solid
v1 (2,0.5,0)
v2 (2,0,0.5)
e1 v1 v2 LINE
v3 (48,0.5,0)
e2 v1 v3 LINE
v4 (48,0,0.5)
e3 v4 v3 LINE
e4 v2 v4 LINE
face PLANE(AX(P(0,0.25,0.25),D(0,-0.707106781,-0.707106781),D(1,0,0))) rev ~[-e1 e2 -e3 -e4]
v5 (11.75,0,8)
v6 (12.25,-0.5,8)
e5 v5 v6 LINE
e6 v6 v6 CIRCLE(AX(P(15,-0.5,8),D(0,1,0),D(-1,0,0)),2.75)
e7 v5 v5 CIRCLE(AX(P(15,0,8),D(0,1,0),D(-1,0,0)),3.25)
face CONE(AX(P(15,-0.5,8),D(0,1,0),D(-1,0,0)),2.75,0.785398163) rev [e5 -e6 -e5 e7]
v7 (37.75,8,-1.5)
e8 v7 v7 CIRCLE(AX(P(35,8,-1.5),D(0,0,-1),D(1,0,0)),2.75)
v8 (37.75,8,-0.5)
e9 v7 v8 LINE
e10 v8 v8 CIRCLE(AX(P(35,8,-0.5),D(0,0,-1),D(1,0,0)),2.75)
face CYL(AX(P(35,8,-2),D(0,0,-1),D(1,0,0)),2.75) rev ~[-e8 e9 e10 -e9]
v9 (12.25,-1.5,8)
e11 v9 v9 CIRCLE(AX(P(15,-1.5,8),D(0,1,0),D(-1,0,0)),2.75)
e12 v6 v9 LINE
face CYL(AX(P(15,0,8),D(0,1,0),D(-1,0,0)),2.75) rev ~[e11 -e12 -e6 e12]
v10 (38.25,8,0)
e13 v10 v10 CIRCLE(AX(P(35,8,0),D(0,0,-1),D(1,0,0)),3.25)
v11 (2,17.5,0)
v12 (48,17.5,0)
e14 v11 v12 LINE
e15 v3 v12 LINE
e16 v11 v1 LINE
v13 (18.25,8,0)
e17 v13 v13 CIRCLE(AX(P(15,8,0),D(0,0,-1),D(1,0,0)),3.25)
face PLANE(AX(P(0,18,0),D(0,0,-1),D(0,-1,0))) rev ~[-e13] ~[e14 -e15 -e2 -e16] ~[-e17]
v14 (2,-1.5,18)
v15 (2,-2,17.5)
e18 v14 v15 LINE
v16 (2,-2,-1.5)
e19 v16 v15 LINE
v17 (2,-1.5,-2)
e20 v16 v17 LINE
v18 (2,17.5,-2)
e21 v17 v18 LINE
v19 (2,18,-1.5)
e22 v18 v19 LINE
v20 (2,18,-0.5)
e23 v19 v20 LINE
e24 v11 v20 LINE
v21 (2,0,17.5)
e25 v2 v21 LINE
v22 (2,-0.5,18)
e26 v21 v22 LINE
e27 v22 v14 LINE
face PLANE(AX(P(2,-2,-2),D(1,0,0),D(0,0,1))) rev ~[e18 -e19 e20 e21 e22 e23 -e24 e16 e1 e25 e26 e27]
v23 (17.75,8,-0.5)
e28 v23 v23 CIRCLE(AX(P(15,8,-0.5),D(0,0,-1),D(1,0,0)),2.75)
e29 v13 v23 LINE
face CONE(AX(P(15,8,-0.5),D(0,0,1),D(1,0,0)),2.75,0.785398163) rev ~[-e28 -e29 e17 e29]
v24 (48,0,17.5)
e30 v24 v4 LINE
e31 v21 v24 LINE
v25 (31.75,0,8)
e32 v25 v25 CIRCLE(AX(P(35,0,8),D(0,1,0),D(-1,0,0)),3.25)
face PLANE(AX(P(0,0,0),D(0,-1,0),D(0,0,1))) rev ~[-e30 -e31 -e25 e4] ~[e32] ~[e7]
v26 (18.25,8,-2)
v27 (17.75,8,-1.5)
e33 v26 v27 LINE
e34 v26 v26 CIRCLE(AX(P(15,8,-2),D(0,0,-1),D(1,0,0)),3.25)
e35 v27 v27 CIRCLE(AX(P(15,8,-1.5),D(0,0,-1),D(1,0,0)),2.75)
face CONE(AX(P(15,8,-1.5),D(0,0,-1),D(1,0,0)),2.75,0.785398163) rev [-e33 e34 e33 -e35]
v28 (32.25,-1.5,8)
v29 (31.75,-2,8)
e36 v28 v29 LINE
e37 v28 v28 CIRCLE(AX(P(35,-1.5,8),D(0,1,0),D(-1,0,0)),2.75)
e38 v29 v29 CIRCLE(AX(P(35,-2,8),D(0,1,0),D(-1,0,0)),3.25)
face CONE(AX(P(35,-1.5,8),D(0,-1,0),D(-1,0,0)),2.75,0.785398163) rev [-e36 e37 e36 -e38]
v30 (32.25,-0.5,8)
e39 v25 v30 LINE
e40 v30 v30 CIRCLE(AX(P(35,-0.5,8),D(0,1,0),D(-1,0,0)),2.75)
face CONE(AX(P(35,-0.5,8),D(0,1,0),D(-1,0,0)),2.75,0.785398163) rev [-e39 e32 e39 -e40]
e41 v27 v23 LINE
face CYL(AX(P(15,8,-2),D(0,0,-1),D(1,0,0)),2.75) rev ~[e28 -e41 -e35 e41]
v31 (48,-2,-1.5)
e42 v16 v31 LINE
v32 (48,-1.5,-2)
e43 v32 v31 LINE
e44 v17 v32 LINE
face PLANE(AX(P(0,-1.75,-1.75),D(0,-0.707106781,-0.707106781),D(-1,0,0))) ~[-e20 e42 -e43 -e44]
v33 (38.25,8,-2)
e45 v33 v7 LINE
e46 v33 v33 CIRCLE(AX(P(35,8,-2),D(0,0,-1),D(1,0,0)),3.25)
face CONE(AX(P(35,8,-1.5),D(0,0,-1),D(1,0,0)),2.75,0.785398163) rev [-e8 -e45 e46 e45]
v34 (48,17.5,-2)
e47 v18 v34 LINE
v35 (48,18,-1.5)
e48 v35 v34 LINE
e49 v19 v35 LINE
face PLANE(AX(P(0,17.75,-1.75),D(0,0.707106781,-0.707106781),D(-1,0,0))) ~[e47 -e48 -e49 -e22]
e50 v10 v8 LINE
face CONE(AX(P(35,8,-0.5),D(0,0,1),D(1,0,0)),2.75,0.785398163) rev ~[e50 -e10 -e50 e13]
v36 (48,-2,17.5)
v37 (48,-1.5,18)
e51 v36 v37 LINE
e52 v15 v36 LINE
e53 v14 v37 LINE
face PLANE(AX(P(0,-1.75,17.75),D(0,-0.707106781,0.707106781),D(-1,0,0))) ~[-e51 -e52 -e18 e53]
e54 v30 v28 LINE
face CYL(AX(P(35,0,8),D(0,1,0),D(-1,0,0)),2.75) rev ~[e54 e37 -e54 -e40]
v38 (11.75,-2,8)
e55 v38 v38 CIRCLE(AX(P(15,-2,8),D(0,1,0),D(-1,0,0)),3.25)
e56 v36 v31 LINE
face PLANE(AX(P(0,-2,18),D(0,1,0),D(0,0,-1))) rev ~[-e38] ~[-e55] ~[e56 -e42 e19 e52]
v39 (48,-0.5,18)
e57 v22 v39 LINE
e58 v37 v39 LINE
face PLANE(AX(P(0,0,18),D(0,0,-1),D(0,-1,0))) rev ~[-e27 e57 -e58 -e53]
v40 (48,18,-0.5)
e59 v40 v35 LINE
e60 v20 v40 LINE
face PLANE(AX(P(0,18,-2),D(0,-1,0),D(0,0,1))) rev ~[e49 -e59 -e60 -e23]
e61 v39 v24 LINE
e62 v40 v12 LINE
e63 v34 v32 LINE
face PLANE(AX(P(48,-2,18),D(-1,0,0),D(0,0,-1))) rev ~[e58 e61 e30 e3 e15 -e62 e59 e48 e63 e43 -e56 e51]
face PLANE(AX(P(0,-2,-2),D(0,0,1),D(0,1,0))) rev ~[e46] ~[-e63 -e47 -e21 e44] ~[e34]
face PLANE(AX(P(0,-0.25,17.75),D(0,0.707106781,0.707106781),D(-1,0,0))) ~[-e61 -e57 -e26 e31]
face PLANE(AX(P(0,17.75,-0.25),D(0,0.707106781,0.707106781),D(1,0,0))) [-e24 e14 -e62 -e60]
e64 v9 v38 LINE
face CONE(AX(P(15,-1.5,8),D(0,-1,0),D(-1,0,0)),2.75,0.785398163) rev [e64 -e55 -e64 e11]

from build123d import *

# Parameters (mm, degrees)
F1_DEPTH  = 50
F2_SIZE   = 0.5
F3_R      = 2.75
F4_DEPTH  = 25
F5_SIZE   = 0.5
F6_R      = 2.75
F7_DEPTH  = 25
F8_SIZE   = 0.5
F9_W      = 1.5
F9_H      = 19
F10_DEPTH = 25


with BuildPart() as f1:
    # F0 (on Right) → F1 (new body)
    with BuildSketch(Plane.YZ):
        Polygon((18, 0), (0, 0), (0, 18), (-2, 18), (-2, -2), (18, -2), align=None)
    extrude(amount=F1_DEPTH)

    # F2
    f2_edges = [f1.edges().sort_by_distance(p)[0] for p in [
        (25, 0, 18),
        (25, -2, 18),
        (0, -1, 18),
        (50, -1, 18),
        (25, 18, 0),
        (25, 0, 0),
        (0, 9, 0),
        (50, 9, 0),
        (25, -2, -2),
        (25, 18, -2),
        (0, 8, -2),
        (50, 8, -2),
        (0, -2, 8),
        (50, -2, 8),
    ]]
    chamfer(f2_edges, length=F2_SIZE)

    # F3 (on face) → F4 (cut)
    with BuildSketch(Plane(origin=(0, 0, 0), x_dir=(-1, 0, 0), z_dir=(0, 1, 0))):
        with Locations((-15, 8)):
            Circle(F3_R)
        with Locations((-35, 8)):
            Circle(F3_R)
    extrude(amount=-F4_DEPTH, mode=Mode.SUBTRACT)

    # F5
    f5_edges = [f1.edges().sort_by_distance(p)[0] for p in [
        (17.75, 0, 8),
        (12.25, -1, 8),
        (17.75, -2, 8),
        (37.75, 0, 8),
        (32.25, -1, 8),
        (37.75, -2, 8),
    ]]
    chamfer(f5_edges, length=F5_SIZE)

    # F6 (on face) → F7 (cut)
    with BuildSketch(Plane(origin=(0, 0, -2), x_dir=(1, 0, 0), z_dir=(0, 0, -1))):
        with Locations((15, -8)):
            Circle(F6_R)
        with Locations((35, -8)):
            Circle(F6_R)
    extrude(amount=-F7_DEPTH, mode=Mode.SUBTRACT)

    # F8
    f8_edges = [f1.edges().sort_by_distance(p)[0] for p in [
        (12.25, 8, -2),
        (17.75, 8, -1),
        (12.25, 8, 0),
        (32.25, 8, -2),
        (37.75, 8, -1),
        (32.25, 8, 0),
    ]]
    chamfer(f8_edges, length=F8_SIZE)

    # F9 (on face) → F10 (cut)
    with BuildSketch(Plane.XZ.offset(2)):
        Polygon((51.7472885549, 18), (48, 18), (48, 17.5), (49.5, 17.5), (49.5, -1.5), (48, -1.5), (48, -2), (48, -2.0400607027), (51.7472885549, -2.0400607027), align=None)
        with Locations((48.75, 8)):
            Rectangle(F9_W, F9_H)
        Polygon((2, 17.5), (2, 18), (2, 19.6672808379), (-2.285732422, 19.6672808379), (-2.285732422, -2), (2, -2), (2, -1.5), (0.5, -1.5), (0.5, 17.5), align=None)
        with Locations((1.25, 8)):
            Rectangle(F9_W, F9_H)
    extrude(amount=-F10_DEPTH, mode=Mode.SUBTRACT)


solid = f1.part
